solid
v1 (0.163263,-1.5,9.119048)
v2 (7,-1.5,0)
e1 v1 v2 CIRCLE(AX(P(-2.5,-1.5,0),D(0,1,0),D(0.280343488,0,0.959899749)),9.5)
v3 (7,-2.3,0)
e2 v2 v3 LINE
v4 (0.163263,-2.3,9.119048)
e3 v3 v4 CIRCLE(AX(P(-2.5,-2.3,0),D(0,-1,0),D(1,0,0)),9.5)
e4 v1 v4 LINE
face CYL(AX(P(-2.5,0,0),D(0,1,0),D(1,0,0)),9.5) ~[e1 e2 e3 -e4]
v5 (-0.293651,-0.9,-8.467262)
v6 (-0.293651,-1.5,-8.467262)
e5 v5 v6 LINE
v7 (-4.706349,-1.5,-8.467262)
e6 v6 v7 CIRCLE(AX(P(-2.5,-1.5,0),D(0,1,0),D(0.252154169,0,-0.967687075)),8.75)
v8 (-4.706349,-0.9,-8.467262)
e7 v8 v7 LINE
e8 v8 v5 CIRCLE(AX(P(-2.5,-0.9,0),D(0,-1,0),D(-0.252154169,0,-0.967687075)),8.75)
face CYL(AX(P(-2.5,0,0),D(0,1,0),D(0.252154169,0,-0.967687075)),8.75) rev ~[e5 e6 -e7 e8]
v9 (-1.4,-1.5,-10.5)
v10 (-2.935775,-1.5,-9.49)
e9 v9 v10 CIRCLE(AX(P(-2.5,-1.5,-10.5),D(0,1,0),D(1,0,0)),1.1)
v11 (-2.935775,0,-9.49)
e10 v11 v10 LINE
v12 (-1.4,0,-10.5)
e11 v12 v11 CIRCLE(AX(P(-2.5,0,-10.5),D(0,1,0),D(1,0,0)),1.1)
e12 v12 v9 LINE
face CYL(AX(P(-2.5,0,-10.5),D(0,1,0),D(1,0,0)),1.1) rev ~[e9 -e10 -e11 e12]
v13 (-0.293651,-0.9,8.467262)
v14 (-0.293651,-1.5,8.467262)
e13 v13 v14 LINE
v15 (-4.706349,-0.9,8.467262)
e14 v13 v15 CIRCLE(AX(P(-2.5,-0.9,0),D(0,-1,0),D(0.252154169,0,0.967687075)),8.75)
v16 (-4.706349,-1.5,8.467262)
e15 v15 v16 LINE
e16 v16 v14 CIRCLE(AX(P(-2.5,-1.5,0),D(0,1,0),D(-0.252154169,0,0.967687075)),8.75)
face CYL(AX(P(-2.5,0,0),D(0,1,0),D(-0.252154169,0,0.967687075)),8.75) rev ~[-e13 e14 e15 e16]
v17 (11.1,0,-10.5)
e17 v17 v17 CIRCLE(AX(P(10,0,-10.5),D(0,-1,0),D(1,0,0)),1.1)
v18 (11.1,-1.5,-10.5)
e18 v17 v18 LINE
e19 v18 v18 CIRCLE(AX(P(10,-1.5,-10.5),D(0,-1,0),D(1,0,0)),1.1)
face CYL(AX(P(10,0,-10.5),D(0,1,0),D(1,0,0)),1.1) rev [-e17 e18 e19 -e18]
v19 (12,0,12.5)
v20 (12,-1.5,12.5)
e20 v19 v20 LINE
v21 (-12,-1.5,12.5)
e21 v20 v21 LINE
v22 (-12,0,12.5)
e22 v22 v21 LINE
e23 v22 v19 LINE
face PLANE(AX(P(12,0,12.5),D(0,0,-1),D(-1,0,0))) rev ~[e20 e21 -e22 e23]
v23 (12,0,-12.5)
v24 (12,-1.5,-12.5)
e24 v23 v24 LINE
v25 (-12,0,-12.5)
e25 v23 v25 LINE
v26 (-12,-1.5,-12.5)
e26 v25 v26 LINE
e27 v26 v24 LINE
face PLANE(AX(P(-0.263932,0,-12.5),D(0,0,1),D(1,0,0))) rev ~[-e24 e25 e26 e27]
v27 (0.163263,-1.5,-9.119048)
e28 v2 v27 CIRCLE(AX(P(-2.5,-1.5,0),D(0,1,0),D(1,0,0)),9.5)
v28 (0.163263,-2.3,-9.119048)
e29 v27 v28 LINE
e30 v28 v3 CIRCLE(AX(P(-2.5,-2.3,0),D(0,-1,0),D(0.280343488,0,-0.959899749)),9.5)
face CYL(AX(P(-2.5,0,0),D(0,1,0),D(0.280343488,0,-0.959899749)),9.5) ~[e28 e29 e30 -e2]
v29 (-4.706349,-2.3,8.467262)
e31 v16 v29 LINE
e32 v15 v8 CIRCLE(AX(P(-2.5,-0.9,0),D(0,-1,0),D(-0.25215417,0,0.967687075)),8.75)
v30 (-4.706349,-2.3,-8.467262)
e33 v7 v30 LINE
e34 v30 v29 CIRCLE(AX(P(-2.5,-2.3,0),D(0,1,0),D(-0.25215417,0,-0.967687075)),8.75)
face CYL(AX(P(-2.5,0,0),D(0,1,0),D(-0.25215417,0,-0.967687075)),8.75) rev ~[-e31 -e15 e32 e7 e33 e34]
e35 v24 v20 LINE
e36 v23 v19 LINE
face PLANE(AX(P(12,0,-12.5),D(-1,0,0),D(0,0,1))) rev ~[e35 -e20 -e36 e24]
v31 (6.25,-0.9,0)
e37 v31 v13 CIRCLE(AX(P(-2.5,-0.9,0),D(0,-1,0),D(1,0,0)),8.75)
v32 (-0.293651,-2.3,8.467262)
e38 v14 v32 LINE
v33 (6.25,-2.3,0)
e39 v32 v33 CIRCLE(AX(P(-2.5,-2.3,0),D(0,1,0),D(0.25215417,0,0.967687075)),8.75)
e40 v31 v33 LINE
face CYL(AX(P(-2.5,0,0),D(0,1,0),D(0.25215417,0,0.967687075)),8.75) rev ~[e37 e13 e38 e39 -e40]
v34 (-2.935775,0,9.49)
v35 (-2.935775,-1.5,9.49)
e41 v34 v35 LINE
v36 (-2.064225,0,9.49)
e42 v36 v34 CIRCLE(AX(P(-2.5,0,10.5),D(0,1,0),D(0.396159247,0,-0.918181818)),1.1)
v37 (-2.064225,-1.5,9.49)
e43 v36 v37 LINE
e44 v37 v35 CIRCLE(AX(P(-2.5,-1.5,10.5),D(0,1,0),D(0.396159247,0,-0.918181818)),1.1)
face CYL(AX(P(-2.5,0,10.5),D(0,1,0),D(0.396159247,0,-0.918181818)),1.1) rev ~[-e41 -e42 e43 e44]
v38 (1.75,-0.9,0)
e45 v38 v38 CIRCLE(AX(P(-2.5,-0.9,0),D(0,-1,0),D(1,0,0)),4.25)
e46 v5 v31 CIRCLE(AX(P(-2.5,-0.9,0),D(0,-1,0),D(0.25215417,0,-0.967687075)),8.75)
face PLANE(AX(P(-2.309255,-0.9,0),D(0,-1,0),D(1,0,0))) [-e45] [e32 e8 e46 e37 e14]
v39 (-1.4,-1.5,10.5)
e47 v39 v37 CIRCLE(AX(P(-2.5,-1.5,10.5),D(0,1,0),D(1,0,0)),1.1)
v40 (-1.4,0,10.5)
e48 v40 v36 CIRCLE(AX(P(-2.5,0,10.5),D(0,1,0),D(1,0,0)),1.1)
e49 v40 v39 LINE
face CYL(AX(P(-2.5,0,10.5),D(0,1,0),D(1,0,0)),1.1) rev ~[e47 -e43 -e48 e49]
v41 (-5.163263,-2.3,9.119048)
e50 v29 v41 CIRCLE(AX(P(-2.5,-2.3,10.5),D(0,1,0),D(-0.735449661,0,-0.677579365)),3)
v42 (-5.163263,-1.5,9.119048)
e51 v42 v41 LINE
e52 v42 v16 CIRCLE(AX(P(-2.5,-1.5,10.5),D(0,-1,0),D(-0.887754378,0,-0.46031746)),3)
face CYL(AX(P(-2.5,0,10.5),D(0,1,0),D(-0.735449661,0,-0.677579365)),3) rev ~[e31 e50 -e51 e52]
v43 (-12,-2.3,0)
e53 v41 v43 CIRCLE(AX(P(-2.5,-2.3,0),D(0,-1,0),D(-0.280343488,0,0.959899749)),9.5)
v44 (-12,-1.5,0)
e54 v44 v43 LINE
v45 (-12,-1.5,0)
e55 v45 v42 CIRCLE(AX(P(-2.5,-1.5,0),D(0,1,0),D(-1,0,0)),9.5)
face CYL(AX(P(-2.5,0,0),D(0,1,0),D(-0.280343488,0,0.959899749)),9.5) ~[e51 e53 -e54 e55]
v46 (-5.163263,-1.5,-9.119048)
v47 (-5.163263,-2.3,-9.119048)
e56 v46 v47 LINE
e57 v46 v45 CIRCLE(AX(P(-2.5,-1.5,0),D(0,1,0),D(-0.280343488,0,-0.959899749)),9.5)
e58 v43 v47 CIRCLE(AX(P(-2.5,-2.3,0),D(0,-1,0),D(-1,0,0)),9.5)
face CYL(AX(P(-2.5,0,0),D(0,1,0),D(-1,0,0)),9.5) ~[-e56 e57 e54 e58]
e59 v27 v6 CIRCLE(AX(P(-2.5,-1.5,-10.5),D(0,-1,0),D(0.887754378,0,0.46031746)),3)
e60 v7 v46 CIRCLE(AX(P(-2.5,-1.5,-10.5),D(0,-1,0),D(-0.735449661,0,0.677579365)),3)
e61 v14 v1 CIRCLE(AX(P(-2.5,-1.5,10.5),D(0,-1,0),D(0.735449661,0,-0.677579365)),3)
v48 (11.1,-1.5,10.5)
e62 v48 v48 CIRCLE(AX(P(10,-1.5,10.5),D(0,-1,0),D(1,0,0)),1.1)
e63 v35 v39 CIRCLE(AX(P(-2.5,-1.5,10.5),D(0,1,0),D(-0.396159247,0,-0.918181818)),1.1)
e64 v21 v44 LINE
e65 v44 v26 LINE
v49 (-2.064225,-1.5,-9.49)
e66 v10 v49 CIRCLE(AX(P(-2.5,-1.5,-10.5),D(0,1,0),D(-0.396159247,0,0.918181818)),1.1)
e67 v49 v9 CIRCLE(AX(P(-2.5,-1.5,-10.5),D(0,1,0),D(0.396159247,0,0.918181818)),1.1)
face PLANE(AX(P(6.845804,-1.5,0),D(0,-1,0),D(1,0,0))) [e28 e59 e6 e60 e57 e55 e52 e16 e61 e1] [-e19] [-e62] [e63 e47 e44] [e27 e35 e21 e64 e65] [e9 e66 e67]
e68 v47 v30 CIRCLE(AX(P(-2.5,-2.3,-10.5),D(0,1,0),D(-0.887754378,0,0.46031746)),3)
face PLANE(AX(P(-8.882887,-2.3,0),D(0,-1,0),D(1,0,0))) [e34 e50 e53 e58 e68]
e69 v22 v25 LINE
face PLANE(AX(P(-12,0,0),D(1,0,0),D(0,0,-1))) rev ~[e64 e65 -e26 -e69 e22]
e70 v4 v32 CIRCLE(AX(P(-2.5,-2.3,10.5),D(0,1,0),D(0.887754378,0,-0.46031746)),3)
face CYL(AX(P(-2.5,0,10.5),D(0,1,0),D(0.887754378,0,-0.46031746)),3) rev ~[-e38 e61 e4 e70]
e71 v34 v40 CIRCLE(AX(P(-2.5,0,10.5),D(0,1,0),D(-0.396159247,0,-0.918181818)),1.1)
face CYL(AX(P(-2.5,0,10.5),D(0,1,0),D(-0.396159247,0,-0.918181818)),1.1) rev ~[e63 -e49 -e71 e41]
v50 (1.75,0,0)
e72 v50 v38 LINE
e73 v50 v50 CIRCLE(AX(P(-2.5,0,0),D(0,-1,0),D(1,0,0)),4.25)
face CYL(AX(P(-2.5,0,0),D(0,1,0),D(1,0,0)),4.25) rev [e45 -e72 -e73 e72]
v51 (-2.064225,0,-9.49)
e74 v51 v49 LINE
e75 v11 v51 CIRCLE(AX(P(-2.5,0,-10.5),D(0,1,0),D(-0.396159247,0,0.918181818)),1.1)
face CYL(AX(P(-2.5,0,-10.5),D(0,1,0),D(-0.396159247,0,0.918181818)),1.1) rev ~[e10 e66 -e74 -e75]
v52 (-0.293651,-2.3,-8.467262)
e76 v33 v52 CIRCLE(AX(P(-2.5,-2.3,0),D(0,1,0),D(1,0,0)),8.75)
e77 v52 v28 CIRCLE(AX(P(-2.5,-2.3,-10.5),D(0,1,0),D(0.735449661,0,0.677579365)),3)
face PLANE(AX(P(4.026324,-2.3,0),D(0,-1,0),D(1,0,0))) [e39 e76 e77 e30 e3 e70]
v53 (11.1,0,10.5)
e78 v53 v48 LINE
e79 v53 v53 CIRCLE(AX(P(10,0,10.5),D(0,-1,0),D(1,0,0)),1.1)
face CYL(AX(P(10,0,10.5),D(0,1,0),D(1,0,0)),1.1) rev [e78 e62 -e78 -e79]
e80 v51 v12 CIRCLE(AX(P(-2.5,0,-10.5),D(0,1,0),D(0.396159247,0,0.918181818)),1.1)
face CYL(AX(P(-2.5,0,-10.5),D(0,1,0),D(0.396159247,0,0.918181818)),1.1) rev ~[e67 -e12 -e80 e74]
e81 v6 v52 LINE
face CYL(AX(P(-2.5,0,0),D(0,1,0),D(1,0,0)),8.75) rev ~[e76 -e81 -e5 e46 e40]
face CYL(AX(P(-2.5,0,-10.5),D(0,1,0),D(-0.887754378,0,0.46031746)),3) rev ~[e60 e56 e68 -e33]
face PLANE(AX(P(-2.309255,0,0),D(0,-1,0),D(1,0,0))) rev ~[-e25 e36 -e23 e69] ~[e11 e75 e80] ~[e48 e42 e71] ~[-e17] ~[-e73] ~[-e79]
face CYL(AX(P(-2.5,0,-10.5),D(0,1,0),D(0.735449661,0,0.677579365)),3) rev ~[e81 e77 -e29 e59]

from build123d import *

# Parameters (mm, degrees)
F1_DEPTH = 1.5
F0_R     = 1.1
F2_DEPTH = 1.5
F3_DEPTH = 2.3
F0_R_2   = 4.25
F4_DEPTH = 0.9


with BuildPart() as f1:
    # F0 (on Front) → F1 (new body)
    with BuildSketch(Plane.XZ):
        with BuildLine():
            Line((-4.7360679775, 12.5), (-12, 12.5))
            Line((-12, 12.5), (-12, 0))
            ThreePointArc((-12, 0), (-10.101019661, 5.6986401986), (-5.1632631341, 9.119047619))
            ThreePointArc((-5.1632631341, 9.119047619), (-5.476335177, 10.8760703579), (-4.7360679775, 12.5))
        make_face()
    extrude(amount=F1_DEPTH)



with BuildPart() as f1b:
    # F0 (on Front) → F1, piece 2 (new body)
    with BuildSketch(Plane.XZ):
        with BuildLine():
            ThreePointArc((-5.1632631341, -9.119047619), (-10.101019661, -5.6986401986), (-12, 0))
            Line((-12, 0), (-12, -12.5))
            Line((-12, -12.5), (-4.7360679775, -12.5))
            ThreePointArc((-4.7360679775, -12.5), (-5.476335177, -10.8760703579), (-5.1632631341, -9.119047619))
        make_face()
    extrude(amount=F1_DEPTH)


with BuildPart() as f1c:
    # F0 (on Front) → F1, piece 3 (new body)
    with BuildSketch(Plane.XZ):
        with BuildLine():
            Line((12, 12.5), (-0.2639320225, 12.5))
            ThreePointArc((-0.2639320225, 12.5), (0.3025170769, 11.5704662693), (0.5, 10.5))
            ThreePointArc((0.5, 10.5), (0.4146002644, 9.7892923957), (0.1632631341, 9.119047619))
            ThreePointArc((0.1632631341, 9.119047619), (5.101019661, 5.6986401986), (7, 0))
            ThreePointArc((7, 0), (5.101019661, -5.6986401986), (0.1632631341, -9.119047619))
            ThreePointArc((0.1632631341, -9.119047619), (0.4146002644, -9.7892923957), (0.5, -10.5))
            ThreePointArc((0.5, -10.5), (0.3025170769, -11.5704662693), (-0.2639320225, -12.5))
            Line((-0.2639320225, -12.5), (12, -12.5))
            Line((12, -12.5), (12, 12.5))
        make_face()
        with Locations((10, -10.5)):
            Circle(F0_R, mode=Mode.SUBTRACT)
        with Locations((10, 10.5)):
            Circle(F0_R, mode=Mode.SUBTRACT)
    extrude(amount=F1_DEPTH)


with BuildPart() as f1d:
    # F0 (on Front) → F1, piece 4 (new body)
    with BuildSketch(Plane.XZ):
        with BuildLine():
            ThreePointArc((-2.9357751714, 9.49), (-4.0605803478, 9.370943868), (-5.1632631341, 9.119047619))
            ThreePointArc((-5.1632631341, 9.119047619), (-4.956519224, 8.7779334211), (-4.7063489833, 8.4672619048))
            ThreePointArc((-4.7063489833, 8.4672619048), (-2.5, 8.75), (-0.2936510167, 8.4672619048))
            ThreePointArc((-0.2936510167, 8.4672619048), (-0.043480776, 8.7779334211), (0.1632631341, 9.119047619))
            ThreePointArc((0.1632631341, 9.119047619), (-0.9394196522, 9.370943868), (-2.0642248286, 9.49))
            ThreePointArc((-2.0642248286, 9.49), (-2.5, 9.4), (-2.9357751714, 9.49))
        make_face()
    extrude(amount=F1_DEPTH)


with BuildPart() as f1_1:
    add(f1.part)

    add(f1b.part)  # F2 merges F1b

    add(f1c.part)  # F2 merges F1c

    add(f1d.part)  # F2 merges F1d
    # F0 (on Front) → F2 (join)
    with BuildSketch(Plane.XZ):
        with BuildLine():
            Line((12, 12.5), (-0.2639320225, 12.5))
            ThreePointArc((-0.2639320225, 12.5), (0.3025170769, 11.5704662693), (0.5, 10.5))
            ThreePointArc((0.5, 10.5), (0.4146002644, 9.7892923957), (0.1632631341, 9.119047619))
            ThreePointArc((0.1632631341, 9.119047619), (5.101019661, 5.6986401986), (7, 0))
            ThreePointArc((7, 0), (5.101019661, -5.6986401986), (0.1632631341, -9.119047619))
            ThreePointArc((0.1632631341, -9.119047619), (0.4146002644, -9.7892923957), (0.5, -10.5))
            ThreePointArc((0.5, -10.5), (0.3025170769, -11.5704662693), (-0.2639320225, -12.5))
            Line((-0.2639320225, -12.5), (12, -12.5))
            Line((12, -12.5), (12, 12.5))
        make_face()
        with Locations((10, -10.5)):
            Circle(F0_R, mode=Mode.SUBTRACT)
        with Locations((10, 10.5)):
            Circle(F0_R, mode=Mode.SUBTRACT)
        with BuildLine():
            ThreePointArc((-2.9357751714, -9.49), (-4.0605803478, -9.370943868), (-5.1632631341, -9.119047619))
            ThreePointArc((-5.1632631341, -9.119047619), (-5.476335177, -10.8760703579), (-4.7360679775, -12.5))
            Line((-4.7360679775, -12.5), (-0.2639320225, -12.5))
            ThreePointArc((-0.2639320225, -12.5), (0.3025170769, -11.5704662693), (0.5, -10.5))
            ThreePointArc((0.5, -10.5), (0.4146002644, -9.7892923957), (0.1632631341, -9.119047619))
            ThreePointArc((0.1632631341, -9.119047619), (-0.9394196522, -9.370943868), (-2.0642248286, -9.49))
            ThreePointArc((-2.0642248286, -9.49), (-1.5809372468, -9.8955799013), (-1.4, -10.5))
            ThreePointArc((-1.4, -10.5), (-3.1044200987, -11.4190627532), (-2.9357751714, -9.49))
        make_face()
        with BuildLine():
            Line((-0.2639320225, 12.5), (-4.7360679775, 12.5))
            ThreePointArc((-4.7360679775, 12.5), (-5.476335177, 10.8760703579), (-5.1632631341, 9.119047619))
            ThreePointArc((-5.1632631341, 9.119047619), (-4.0605803478, 9.370943868), (-2.9357751714, 9.49))
            ThreePointArc((-2.9357751714, 9.49), (-3.1044200987, 11.4190627532), (-1.4, 10.5))
            ThreePointArc((-1.4, 10.5), (-1.5809372468, 9.8955799013), (-2.0642248286, 9.49))
            ThreePointArc((-2.0642248286, 9.49), (-0.9394196522, 9.370943868), (0.1632631341, 9.119047619))
            ThreePointArc((0.1632631341, 9.119047619), (0.4146002644, 9.7892923957), (0.5, 10.5))
            ThreePointArc((0.5, 10.5), (0.3025170769, 11.5704662693), (-0.2639320225, 12.5))
        make_face()
        with BuildLine():
            ThreePointArc((-4.7063489833, -8.4672619048), (-4.956519224, -8.7779334211), (-5.1632631341, -9.119047619))
            ThreePointArc((-5.1632631341, -9.119047619), (-4.0605803478, -9.370943868), (-2.9357751714, -9.49))
            ThreePointArc((-2.9357751714, -9.49), (-2.5, -9.4), (-2.0642248286, -9.49))
            ThreePointArc((-2.0642248286, -9.49), (-0.9394196522, -9.370943868), (0.1632631341, -9.119047619))
            ThreePointArc((0.1632631341, -9.119047619), (-0.043480776, -8.7779334211), (-0.2936510167, -8.4672619048))
            ThreePointArc((-0.2936510167, -8.4672619048), (-2.5, -8.75), (-4.7063489833, -8.4672619048))
        make_face()
    extrude(amount=F2_DEPTH)

    # F0 (on Front) → F3 (join)
    with BuildSketch(Plane.XZ):
        with BuildLine():
            ThreePointArc((-5.1632631341, 9.119047619), (-10.101019661, 5.6986401986), (-12, 0))
            ThreePointArc((-12, 0), (-10.101019661, -5.6986401986), (-5.1632631341, -9.119047619))
            ThreePointArc((-5.1632631341, -9.119047619), (-4.956519224, -8.7779334211), (-4.7063489833, -8.4672619048))
            ThreePointArc((-4.7063489833, -8.4672619048), (-11.25, 0), (-4.7063489833, 8.4672619048))
            ThreePointArc((-4.7063489833, 8.4672619048), (-4.956519224, 8.7779334211), (-5.1632631341, 9.119047619))
        make_face()
        with BuildLine():
            ThreePointArc((7, 0), (5.101019661, 5.6986401986), (0.1632631341, 9.119047619))
            ThreePointArc((0.1632631341, 9.119047619), (-0.043480776, 8.7779334211), (-0.2936510167, 8.4672619048))
            ThreePointArc((-0.2936510167, 8.4672619048), (4.4234403877, 5.3505582137), (6.25, 0))
            ThreePointArc((6.25, 0), (4.4234403877, -5.3505582137), (-0.2936510167, -8.4672619048))
            ThreePointArc((-0.2936510167, -8.4672619048), (-0.043480776, -8.7779334211), (0.1632631341, -9.119047619))
            ThreePointArc((0.1632631341, -9.119047619), (5.101019661, -5.6986401986), (7, 0))
        make_face()
    extrude(amount=F3_DEPTH)

    # F0 (on Front) → F4 (join)
    with BuildSketch(Plane.XZ):
        with BuildLine():
            ThreePointArc((-0.2936510167, 8.4672619048), (-2.5, 7.5), (-4.7063489833, 8.4672619048))
            ThreePointArc((-4.7063489833, 8.4672619048), (-11.25, 0), (-4.7063489833, -8.4672619048))
            ThreePointArc((-4.7063489833, -8.4672619048), (-2.5, -7.5), (-0.2936510167, -8.4672619048))
            ThreePointArc((-0.2936510167, -8.4672619048), (4.4234403877, -5.3505582137), (6.25, 0))
            ThreePointArc((6.25, 0), (4.4234403877, 5.3505582137), (-0.2936510167, 8.4672619048))
        make_face()
        with Locations((-2.5, 0)):
            Circle(F0_R_2, mode=Mode.SUBTRACT)
        with BuildLine():
            ThreePointArc((-0.2936510167, 8.4672619048), (-2.5, 8.75), (-4.7063489833, 8.4672619048))
            ThreePointArc((-4.7063489833, 8.4672619048), (-2.5, 7.5), (-0.2936510167, 8.4672619048))
        make_face()
        with BuildLine():
            ThreePointArc((-0.2936510167, -8.4672619048), (-2.5, -7.5), (-4.7063489833, -8.4672619048))
            ThreePointArc((-4.7063489833, -8.4672619048), (-2.5, -8.75), (-0.2936510167, -8.4672619048))
        make_face()
    extrude(amount=F4_DEPTH)


solid = f1_1.part
